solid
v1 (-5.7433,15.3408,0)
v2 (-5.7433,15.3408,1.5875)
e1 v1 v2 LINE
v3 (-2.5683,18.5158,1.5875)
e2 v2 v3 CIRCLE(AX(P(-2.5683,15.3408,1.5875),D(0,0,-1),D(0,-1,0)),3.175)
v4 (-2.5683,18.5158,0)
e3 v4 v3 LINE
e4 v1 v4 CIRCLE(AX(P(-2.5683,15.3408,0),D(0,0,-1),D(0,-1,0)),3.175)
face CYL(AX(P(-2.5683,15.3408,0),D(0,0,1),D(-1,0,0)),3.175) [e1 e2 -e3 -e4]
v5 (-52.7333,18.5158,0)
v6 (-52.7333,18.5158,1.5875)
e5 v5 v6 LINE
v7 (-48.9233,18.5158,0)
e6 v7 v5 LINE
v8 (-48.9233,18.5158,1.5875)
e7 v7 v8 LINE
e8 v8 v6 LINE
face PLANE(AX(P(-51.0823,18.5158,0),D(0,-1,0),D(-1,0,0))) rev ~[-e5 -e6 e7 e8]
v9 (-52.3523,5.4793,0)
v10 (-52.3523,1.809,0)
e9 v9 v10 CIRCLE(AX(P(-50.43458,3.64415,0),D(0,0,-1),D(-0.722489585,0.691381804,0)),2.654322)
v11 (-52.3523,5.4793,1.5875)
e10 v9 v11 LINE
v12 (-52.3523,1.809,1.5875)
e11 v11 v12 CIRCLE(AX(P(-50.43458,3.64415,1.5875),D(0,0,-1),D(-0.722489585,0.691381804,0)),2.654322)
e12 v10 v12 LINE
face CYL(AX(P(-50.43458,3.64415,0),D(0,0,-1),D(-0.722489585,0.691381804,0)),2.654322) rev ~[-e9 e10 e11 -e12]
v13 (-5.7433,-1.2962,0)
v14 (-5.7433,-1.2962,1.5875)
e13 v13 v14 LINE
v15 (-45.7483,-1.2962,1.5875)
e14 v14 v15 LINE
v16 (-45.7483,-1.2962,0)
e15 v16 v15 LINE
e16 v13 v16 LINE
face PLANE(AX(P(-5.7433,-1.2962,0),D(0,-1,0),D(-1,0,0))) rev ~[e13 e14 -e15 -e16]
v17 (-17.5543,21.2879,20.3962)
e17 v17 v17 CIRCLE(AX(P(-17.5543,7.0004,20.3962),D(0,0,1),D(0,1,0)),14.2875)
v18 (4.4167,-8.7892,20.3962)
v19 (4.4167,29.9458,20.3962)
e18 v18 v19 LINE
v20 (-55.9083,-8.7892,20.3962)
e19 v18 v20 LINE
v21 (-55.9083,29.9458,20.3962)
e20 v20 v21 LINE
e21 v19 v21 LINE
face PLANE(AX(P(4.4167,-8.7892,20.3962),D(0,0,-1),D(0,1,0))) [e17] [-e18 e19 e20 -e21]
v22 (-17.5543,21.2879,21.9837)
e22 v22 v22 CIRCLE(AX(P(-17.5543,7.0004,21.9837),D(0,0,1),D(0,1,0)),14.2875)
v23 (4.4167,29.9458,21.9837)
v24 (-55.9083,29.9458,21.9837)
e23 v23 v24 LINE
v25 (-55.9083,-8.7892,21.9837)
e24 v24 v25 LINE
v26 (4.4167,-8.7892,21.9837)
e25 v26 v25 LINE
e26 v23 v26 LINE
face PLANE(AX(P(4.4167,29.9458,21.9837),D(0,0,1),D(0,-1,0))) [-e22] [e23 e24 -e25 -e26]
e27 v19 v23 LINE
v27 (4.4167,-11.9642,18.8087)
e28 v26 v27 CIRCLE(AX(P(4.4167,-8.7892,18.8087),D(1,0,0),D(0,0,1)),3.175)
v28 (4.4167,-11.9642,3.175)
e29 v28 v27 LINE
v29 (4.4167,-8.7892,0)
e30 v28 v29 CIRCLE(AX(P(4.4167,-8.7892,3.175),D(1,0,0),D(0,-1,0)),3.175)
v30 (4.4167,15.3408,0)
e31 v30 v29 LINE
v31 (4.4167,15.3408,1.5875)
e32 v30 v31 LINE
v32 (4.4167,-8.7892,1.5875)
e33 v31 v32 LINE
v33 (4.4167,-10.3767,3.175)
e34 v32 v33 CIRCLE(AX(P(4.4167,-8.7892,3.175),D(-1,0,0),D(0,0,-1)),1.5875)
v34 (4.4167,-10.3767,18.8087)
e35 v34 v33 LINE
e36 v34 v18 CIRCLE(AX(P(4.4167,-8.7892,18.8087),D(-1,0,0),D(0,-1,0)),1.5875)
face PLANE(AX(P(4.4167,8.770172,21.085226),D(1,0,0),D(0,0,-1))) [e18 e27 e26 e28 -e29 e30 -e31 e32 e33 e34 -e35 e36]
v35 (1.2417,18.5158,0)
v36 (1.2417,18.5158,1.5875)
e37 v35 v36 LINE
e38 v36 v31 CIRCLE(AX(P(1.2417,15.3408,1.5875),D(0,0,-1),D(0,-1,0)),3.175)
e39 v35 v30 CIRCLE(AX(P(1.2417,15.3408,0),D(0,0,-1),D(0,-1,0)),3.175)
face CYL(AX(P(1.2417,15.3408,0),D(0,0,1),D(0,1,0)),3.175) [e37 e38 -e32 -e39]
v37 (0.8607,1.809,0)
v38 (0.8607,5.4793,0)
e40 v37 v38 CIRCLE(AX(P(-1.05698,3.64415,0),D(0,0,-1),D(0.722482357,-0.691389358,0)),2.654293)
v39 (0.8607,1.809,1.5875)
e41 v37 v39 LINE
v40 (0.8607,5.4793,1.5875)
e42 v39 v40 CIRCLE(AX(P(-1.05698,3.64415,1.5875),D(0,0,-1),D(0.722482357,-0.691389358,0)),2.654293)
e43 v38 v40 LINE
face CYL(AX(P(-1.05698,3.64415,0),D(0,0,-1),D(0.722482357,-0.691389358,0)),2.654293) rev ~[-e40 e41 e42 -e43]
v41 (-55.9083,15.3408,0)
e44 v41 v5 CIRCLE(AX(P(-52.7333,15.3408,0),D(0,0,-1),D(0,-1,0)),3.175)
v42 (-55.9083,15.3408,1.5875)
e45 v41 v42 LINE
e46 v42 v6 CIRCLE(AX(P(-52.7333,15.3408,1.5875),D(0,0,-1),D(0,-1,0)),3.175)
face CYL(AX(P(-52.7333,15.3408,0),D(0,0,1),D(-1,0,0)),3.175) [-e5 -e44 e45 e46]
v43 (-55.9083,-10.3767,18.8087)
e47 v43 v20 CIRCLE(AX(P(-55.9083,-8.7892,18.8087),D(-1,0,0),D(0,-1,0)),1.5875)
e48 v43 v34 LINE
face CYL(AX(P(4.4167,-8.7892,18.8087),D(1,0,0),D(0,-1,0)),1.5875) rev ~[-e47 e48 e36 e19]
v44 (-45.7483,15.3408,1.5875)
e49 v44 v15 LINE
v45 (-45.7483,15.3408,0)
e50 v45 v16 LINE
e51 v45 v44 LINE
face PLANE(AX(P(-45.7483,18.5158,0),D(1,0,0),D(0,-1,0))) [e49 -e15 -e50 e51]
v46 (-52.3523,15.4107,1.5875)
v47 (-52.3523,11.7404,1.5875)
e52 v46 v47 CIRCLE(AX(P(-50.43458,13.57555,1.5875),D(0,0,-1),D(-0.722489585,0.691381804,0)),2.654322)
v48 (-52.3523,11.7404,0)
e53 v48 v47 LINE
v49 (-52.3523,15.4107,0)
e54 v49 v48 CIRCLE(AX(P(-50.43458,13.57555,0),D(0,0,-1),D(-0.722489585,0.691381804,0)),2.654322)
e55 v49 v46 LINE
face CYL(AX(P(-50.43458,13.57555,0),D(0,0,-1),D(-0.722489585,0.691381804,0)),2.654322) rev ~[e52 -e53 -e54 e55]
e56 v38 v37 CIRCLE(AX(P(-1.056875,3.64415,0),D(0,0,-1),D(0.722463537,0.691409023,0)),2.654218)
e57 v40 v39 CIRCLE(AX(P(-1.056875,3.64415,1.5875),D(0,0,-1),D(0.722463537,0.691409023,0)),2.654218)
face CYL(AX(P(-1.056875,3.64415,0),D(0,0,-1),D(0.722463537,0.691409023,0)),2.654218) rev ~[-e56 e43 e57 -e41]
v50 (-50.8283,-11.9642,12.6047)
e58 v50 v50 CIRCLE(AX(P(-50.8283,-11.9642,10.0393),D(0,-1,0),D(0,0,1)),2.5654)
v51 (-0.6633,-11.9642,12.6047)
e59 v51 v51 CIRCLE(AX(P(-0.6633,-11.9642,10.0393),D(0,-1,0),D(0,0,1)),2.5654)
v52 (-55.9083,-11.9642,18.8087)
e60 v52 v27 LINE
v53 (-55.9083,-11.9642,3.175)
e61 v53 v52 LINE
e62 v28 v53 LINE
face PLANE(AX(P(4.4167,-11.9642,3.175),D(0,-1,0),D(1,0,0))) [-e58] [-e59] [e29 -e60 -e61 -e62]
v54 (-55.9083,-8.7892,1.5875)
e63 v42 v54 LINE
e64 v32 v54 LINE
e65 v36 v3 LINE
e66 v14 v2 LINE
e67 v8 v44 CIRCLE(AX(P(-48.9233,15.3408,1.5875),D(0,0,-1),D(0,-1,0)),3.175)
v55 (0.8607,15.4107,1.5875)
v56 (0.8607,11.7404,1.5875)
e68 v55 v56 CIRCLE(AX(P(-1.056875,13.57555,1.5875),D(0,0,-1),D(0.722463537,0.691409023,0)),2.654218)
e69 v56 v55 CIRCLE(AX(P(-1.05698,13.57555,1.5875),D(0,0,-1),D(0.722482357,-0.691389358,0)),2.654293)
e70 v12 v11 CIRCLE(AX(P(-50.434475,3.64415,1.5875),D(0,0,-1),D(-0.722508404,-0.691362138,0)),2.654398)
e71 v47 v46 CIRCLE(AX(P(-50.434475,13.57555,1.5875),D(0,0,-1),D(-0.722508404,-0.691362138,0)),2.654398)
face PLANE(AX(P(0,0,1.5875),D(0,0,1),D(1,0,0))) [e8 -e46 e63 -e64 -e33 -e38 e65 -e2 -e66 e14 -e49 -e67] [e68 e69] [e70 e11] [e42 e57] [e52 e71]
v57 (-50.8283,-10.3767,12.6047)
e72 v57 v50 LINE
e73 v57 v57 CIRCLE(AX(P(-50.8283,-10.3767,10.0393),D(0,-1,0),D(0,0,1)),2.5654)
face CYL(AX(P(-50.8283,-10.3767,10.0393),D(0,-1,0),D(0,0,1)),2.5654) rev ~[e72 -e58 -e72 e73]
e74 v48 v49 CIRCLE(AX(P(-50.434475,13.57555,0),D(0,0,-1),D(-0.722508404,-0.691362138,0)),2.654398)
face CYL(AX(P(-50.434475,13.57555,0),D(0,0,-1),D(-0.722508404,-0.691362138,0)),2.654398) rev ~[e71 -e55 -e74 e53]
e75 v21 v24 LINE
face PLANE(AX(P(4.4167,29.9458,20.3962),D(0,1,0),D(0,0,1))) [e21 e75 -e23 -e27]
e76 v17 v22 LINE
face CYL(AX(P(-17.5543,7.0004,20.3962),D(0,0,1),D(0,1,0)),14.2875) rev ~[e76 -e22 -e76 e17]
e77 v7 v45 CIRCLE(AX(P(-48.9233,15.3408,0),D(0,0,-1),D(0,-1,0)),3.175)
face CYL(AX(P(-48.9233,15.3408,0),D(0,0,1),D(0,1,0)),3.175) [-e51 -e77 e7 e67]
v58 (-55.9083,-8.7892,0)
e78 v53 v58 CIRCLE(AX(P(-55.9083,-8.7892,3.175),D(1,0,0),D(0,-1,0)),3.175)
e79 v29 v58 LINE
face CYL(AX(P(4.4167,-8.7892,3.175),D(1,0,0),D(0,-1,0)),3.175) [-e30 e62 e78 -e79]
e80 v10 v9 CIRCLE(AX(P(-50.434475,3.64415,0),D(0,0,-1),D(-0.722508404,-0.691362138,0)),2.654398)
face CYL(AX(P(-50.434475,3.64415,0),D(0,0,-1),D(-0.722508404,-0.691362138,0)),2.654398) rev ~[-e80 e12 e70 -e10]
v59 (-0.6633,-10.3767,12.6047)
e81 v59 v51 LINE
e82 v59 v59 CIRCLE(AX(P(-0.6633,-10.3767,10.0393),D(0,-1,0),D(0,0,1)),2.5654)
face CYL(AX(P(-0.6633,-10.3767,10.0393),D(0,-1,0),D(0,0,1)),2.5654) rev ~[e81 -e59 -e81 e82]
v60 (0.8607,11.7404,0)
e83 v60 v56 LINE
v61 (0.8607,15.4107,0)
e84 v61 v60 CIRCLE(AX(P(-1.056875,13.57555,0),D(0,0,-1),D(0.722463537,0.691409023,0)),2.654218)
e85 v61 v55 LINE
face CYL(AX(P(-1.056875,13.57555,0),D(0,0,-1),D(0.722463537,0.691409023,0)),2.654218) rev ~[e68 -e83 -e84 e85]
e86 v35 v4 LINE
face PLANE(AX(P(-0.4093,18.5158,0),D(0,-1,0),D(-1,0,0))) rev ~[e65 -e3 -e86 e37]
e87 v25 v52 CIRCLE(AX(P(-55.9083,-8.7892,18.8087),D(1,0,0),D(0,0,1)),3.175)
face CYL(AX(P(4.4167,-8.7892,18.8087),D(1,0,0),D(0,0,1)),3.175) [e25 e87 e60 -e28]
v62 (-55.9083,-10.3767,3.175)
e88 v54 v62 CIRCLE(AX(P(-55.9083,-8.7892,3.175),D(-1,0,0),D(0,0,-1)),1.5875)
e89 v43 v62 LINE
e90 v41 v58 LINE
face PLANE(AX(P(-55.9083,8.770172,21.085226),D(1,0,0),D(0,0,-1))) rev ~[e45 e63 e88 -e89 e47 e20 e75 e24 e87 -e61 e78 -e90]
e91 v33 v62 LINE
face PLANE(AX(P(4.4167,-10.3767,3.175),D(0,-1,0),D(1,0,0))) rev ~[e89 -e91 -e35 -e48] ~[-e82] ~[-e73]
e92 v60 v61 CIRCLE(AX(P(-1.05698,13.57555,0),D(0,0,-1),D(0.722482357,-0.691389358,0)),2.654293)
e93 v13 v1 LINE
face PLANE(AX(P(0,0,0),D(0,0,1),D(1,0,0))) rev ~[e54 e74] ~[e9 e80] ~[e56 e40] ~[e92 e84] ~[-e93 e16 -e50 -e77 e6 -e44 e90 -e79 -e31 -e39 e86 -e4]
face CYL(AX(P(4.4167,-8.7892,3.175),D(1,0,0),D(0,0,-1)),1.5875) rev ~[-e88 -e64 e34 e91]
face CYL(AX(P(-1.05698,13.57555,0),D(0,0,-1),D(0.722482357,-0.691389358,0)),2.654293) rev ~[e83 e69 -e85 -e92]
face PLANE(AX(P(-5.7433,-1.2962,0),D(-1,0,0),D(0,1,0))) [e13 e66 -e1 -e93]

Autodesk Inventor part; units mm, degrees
ref_plane "YZ Plane" through (0, 0, 0) normal (1, 0, 0) x (0, 1, 0)
ref_plane "Work Plane1" through (-25.7458, -64.4152, -12.319) normal (0, -1, 0) x (0, 0, -1)
ref_plane "Work Plane2" through (0, 0, 0) normal (0, 0, 1) x (1, 0, 0)
sketch "Sketch1" plane through (0, 0, 0) normal (0, 0, 1) x (1, 0, 0)
  line L0 (-0.4093, 18.5158) -> (-5.7433, 18.5158) projected
  line L1 (-5.7433, -1.2962) -> (-5.7433, 18.5158) projected
  line L2 (-45.7483, 18.5158) -> (-51.0823, 18.5158) projected
  line L3 (-45.7483, 18.5158) -> (-45.7483, -1.2962) projected
  line L4 (-5.7433, 18.5158) -> (4.4167, 18.5158)
  line L5 (4.4167, 18.5158) -> (4.4167, -11.9642)
  line L6 (-45.7483, 18.5158) -> (-55.9083, 18.5158)
  line L7 (-55.9083, 18.5158) -> (-55.9083, -11.9642)
  line L8 (-55.9083, -11.9642) -> (4.4167, -11.9642)
  line L9 (-5.7433, -1.2962) -> (-45.7483, -1.2962)
  point P0 (0, 0)
  dimension "d0" = 10.16
  dimension "d1" = 30.48
  dimension "d2" = 10.16
extrude "Extrusion1" add sketch "Sketch1" along normal blind 1.5875
fillet "Corner Round1" radius 3.175 4 edges at (4.4167, 18.5158, 0.7937) (-5.7433, 18.5158, 0.7937) (-45.7483, 18.5158, 0.7937) (-55.9083, 18.5158, 0.7937)
sketch "Sketch2" plane through (4.4167, -10.3767, 0) normal (0, -1, 0) x (1, 0, 0)
  line L0 (-60.325, 0) -> (0, 0)
  line L1 (0, 0) -> (0, 16.9037)
  line L2 (0, 16.9037) -> (-60.325, 16.9037)
  line L3 (-60.325, 16.9037) -> (-60.325, 0)
edge flange "Flange1" height 16.9037 angle 90 thickness 1.5875 bend radius 1.5875 thickness toward (0, -1, 0) relief straight relief width 1.5875 relief depth 0.7937 edges at (-25.7458, -11.9642, 1.5875) wall of the first edge with corners at (-55.9083, -10.3767, 0) (4.4167, -10.3767, 0) (4.4167, -10.3767, 16.9037) (-55.9083, -10.3767, 16.9037)
bend "Bend1"
corner "Corner1"
sketch "Sketch4" plane through (0, 0, 0) normal (0, 0, -1) x (-1, 0, 0)
  arc A0 (-0.8607, 1.809) -> (-0.8607, 5.4793) centre (1.057, 3.6441) ccw projected
  arc A1 (-0.8607, 11.7404) -> (-0.8607, 15.4107) centre (1.057, 13.5755) ccw projected
  arc A2 (52.3523, 15.4107) -> (52.3523, 11.7404) centre (50.4346, 13.5755) ccw projected
  arc A3 (52.3523, 5.4793) -> (52.3523, 1.809) centre (50.4346, 3.6441) ccw projected
  arc A4 (52.3523, 1.809) -> (52.3523, 5.4793) centre (50.4346, 3.6441) ccw
  arc A5 (52.3523, 11.7404) -> (52.3523, 15.4107) centre (50.4346, 13.5755) ccw
  arc A6 (-0.8607, 5.4793) -> (-0.8607, 1.809) centre (1.057, 3.6441) ccw
  arc A7 (-0.8607, 15.4107) -> (-0.8607, 11.7404) centre (1.057, 13.5755) ccw
  point P0 (0, 0)
extrude "Extrusion2" cut sketch "Sketch4" against normal up to surface (1.5875 mm away)
ref_plane "Work Plane4" through (4.4167, -10.3767, 3.175) normal (0, 1, 0) x (1, 0, 0)
sketch "Sketch8" plane through (4.4167, -10.3767, 3.175) normal (0, 1, 0) x (1, 0, 0)
  line L0 (12.7, -13.7287) -> (-73.025, -13.7287) projected
  line L1 (0, 0) -> (-0.1034, -13.7287)
  line L2 (-60.325, 0) -> (0, 0) projected
  line L3 (-60.325, 0) -> (-60.325, -13.7287)
  line L4 (-3.175, 1.5875) -> (-6.985, 1.5875) projected
  line L5 (-5.08, 1.5875) -> (-5.08, -6.8643)
  line L6 (-5.08, -6.8643) -> (0, -6.8644)
  line L7 (0, -13.7287) -> (0, 0) projected
  line L8 (-53.34, 1.5875) -> (-57.15, 1.5875) projected
  line L9 (-55.245, 1.5875) -> (-55.245, -6.8644)
  point P0 (-4.4167, 3.175)
ref_plane "Work Plane3" through (4.4167, -11.9642, 3.175) normal (0, -1, 0) x (1, 0, 0)
sketch "Sketch9" plane through (4.4167, -11.9642, 3.175) normal (0, -1, 0) x (1, 0, 0)
  line L0 (12.7, 13.7287) -> (-73.025, 13.7287) projected
  line L1 (0, 13.7287) -> (-60.325, 13.7287)
  line L2 (-60.325, 13.7287) -> (-60.325, 18.8087)
  line L3 (-60.325, 18.8087) -> (0, 18.8087)
  line L4 (0, 18.8087) -> (0, 13.7287)
  line L5 (-60.325, 13.7287) -> (-60.325, 0) projected
  line L6 (0, 13.7287) -> (0, 0) projected
  point P0 (-4.4167, -3.175)
  dimension "d57" = 5.08
extrude "Extrusion6" add sketch "Sketch9" against normal blind 1.5875
sketch "Sketch11" plane through (4.4167, -11.9642, 20.3962) normal (0, 0, 1) x (1, 0, 0)
  line L0 (-60.325, 0) -> (0, 0)
  line L1 (0, 0) -> (0, 41.91)
  line L2 (0, 41.91) -> (-60.325, 41.91)
  line L3 (-60.325, 41.91) -> (-60.325, 0)
edge flange "Flange4" height 41.91 angle 90 thickness 1.5875 bend radius 1.5875 thickness toward (0, 0, 1) relief straight relief width 1.5875 relief depth 0.7937 edges at (-25.7458, -10.3767, 21.9837) wall of the first edge with corners at (-55.9083, -11.9642, 20.3962) (4.4167, -11.9642, 20.3962) (4.4167, 29.9458, 20.3962) (-55.9083, 29.9458, 20.3962)
bend "Bend4"
corner "Corner4"
hole "Hole1" at (-0.6633, -10.3767, 10.0393) at (-50.8283, -10.3767, 10.0393) direction (0, -1, 0) diameter 5.1308 end through all
sketch "Sketch12" plane through (4.4167, 29.9458, 20.3962) normal (0, 0, -1) x (-1, 0, 0)
  line L0 (21.971, 0.0162) -> (21.971, -22.9454)
  line L1 (60.325, 0) -> (60.325, -38.735) projected
  line L2 (0, 0) -> (0, -38.735) projected
  point P0 (4.4167, -29.9458)
  dimension "d65" = 22.9616
  dimension "d74" = 21.971
hole "Hole2" at (-17.5543, 7.0004, 20.3962) direction (0, 0, 1) diameter 28.575 end through all
equation "\"d63\" = Thickness"
equation "\"d72\" = Thickness"
equation "\"d6\" = BendReliefWidth"
equation "\"d7\" = BendReliefDepth"
equation "\"d8\" = MinimumRemnant"
equation "\"d9\" = BendRadius"
equation "\"d12\" = BendRadius"
equation "\"d13\" = CornerReliefSize"
equation "\"d14\" = GapSize"
equation "\"d15\" = JacobiRadiusSize"
equation "\"d47\" = BendReliefWidth"
equation "\"d48\" = BendReliefDepth"
equation "\"d49\" = MinimumRemnant"
equation "\"d50\" = BendRadius"
equation "\"d53\" = BendRadius"
equation "\"d54\" = CornerReliefSize"
equation "\"d55\" = GapSize"
equation "\"d56\" = JacobiRadiusSize"
equation "\"BendRadius\" = Thickness"
equation "\"BendReliefWidth\" = Thickness"
equation "\"BendReliefDepth\" = 0.5 * Thickness"
equation "\"CornerReliefSize\" = 4 * Thickness"
equation "\"MinimumRemnant\" = 2 * Thickness"
equation "\"TransitionRadius\" = BendRadius"
equation "\"JacobiRadiusSize\" = Thickness"
equation "\"GapSize\" = Thickness"
equation "\"Thickness\" = 1.5875"
properties part number "HSmount"
